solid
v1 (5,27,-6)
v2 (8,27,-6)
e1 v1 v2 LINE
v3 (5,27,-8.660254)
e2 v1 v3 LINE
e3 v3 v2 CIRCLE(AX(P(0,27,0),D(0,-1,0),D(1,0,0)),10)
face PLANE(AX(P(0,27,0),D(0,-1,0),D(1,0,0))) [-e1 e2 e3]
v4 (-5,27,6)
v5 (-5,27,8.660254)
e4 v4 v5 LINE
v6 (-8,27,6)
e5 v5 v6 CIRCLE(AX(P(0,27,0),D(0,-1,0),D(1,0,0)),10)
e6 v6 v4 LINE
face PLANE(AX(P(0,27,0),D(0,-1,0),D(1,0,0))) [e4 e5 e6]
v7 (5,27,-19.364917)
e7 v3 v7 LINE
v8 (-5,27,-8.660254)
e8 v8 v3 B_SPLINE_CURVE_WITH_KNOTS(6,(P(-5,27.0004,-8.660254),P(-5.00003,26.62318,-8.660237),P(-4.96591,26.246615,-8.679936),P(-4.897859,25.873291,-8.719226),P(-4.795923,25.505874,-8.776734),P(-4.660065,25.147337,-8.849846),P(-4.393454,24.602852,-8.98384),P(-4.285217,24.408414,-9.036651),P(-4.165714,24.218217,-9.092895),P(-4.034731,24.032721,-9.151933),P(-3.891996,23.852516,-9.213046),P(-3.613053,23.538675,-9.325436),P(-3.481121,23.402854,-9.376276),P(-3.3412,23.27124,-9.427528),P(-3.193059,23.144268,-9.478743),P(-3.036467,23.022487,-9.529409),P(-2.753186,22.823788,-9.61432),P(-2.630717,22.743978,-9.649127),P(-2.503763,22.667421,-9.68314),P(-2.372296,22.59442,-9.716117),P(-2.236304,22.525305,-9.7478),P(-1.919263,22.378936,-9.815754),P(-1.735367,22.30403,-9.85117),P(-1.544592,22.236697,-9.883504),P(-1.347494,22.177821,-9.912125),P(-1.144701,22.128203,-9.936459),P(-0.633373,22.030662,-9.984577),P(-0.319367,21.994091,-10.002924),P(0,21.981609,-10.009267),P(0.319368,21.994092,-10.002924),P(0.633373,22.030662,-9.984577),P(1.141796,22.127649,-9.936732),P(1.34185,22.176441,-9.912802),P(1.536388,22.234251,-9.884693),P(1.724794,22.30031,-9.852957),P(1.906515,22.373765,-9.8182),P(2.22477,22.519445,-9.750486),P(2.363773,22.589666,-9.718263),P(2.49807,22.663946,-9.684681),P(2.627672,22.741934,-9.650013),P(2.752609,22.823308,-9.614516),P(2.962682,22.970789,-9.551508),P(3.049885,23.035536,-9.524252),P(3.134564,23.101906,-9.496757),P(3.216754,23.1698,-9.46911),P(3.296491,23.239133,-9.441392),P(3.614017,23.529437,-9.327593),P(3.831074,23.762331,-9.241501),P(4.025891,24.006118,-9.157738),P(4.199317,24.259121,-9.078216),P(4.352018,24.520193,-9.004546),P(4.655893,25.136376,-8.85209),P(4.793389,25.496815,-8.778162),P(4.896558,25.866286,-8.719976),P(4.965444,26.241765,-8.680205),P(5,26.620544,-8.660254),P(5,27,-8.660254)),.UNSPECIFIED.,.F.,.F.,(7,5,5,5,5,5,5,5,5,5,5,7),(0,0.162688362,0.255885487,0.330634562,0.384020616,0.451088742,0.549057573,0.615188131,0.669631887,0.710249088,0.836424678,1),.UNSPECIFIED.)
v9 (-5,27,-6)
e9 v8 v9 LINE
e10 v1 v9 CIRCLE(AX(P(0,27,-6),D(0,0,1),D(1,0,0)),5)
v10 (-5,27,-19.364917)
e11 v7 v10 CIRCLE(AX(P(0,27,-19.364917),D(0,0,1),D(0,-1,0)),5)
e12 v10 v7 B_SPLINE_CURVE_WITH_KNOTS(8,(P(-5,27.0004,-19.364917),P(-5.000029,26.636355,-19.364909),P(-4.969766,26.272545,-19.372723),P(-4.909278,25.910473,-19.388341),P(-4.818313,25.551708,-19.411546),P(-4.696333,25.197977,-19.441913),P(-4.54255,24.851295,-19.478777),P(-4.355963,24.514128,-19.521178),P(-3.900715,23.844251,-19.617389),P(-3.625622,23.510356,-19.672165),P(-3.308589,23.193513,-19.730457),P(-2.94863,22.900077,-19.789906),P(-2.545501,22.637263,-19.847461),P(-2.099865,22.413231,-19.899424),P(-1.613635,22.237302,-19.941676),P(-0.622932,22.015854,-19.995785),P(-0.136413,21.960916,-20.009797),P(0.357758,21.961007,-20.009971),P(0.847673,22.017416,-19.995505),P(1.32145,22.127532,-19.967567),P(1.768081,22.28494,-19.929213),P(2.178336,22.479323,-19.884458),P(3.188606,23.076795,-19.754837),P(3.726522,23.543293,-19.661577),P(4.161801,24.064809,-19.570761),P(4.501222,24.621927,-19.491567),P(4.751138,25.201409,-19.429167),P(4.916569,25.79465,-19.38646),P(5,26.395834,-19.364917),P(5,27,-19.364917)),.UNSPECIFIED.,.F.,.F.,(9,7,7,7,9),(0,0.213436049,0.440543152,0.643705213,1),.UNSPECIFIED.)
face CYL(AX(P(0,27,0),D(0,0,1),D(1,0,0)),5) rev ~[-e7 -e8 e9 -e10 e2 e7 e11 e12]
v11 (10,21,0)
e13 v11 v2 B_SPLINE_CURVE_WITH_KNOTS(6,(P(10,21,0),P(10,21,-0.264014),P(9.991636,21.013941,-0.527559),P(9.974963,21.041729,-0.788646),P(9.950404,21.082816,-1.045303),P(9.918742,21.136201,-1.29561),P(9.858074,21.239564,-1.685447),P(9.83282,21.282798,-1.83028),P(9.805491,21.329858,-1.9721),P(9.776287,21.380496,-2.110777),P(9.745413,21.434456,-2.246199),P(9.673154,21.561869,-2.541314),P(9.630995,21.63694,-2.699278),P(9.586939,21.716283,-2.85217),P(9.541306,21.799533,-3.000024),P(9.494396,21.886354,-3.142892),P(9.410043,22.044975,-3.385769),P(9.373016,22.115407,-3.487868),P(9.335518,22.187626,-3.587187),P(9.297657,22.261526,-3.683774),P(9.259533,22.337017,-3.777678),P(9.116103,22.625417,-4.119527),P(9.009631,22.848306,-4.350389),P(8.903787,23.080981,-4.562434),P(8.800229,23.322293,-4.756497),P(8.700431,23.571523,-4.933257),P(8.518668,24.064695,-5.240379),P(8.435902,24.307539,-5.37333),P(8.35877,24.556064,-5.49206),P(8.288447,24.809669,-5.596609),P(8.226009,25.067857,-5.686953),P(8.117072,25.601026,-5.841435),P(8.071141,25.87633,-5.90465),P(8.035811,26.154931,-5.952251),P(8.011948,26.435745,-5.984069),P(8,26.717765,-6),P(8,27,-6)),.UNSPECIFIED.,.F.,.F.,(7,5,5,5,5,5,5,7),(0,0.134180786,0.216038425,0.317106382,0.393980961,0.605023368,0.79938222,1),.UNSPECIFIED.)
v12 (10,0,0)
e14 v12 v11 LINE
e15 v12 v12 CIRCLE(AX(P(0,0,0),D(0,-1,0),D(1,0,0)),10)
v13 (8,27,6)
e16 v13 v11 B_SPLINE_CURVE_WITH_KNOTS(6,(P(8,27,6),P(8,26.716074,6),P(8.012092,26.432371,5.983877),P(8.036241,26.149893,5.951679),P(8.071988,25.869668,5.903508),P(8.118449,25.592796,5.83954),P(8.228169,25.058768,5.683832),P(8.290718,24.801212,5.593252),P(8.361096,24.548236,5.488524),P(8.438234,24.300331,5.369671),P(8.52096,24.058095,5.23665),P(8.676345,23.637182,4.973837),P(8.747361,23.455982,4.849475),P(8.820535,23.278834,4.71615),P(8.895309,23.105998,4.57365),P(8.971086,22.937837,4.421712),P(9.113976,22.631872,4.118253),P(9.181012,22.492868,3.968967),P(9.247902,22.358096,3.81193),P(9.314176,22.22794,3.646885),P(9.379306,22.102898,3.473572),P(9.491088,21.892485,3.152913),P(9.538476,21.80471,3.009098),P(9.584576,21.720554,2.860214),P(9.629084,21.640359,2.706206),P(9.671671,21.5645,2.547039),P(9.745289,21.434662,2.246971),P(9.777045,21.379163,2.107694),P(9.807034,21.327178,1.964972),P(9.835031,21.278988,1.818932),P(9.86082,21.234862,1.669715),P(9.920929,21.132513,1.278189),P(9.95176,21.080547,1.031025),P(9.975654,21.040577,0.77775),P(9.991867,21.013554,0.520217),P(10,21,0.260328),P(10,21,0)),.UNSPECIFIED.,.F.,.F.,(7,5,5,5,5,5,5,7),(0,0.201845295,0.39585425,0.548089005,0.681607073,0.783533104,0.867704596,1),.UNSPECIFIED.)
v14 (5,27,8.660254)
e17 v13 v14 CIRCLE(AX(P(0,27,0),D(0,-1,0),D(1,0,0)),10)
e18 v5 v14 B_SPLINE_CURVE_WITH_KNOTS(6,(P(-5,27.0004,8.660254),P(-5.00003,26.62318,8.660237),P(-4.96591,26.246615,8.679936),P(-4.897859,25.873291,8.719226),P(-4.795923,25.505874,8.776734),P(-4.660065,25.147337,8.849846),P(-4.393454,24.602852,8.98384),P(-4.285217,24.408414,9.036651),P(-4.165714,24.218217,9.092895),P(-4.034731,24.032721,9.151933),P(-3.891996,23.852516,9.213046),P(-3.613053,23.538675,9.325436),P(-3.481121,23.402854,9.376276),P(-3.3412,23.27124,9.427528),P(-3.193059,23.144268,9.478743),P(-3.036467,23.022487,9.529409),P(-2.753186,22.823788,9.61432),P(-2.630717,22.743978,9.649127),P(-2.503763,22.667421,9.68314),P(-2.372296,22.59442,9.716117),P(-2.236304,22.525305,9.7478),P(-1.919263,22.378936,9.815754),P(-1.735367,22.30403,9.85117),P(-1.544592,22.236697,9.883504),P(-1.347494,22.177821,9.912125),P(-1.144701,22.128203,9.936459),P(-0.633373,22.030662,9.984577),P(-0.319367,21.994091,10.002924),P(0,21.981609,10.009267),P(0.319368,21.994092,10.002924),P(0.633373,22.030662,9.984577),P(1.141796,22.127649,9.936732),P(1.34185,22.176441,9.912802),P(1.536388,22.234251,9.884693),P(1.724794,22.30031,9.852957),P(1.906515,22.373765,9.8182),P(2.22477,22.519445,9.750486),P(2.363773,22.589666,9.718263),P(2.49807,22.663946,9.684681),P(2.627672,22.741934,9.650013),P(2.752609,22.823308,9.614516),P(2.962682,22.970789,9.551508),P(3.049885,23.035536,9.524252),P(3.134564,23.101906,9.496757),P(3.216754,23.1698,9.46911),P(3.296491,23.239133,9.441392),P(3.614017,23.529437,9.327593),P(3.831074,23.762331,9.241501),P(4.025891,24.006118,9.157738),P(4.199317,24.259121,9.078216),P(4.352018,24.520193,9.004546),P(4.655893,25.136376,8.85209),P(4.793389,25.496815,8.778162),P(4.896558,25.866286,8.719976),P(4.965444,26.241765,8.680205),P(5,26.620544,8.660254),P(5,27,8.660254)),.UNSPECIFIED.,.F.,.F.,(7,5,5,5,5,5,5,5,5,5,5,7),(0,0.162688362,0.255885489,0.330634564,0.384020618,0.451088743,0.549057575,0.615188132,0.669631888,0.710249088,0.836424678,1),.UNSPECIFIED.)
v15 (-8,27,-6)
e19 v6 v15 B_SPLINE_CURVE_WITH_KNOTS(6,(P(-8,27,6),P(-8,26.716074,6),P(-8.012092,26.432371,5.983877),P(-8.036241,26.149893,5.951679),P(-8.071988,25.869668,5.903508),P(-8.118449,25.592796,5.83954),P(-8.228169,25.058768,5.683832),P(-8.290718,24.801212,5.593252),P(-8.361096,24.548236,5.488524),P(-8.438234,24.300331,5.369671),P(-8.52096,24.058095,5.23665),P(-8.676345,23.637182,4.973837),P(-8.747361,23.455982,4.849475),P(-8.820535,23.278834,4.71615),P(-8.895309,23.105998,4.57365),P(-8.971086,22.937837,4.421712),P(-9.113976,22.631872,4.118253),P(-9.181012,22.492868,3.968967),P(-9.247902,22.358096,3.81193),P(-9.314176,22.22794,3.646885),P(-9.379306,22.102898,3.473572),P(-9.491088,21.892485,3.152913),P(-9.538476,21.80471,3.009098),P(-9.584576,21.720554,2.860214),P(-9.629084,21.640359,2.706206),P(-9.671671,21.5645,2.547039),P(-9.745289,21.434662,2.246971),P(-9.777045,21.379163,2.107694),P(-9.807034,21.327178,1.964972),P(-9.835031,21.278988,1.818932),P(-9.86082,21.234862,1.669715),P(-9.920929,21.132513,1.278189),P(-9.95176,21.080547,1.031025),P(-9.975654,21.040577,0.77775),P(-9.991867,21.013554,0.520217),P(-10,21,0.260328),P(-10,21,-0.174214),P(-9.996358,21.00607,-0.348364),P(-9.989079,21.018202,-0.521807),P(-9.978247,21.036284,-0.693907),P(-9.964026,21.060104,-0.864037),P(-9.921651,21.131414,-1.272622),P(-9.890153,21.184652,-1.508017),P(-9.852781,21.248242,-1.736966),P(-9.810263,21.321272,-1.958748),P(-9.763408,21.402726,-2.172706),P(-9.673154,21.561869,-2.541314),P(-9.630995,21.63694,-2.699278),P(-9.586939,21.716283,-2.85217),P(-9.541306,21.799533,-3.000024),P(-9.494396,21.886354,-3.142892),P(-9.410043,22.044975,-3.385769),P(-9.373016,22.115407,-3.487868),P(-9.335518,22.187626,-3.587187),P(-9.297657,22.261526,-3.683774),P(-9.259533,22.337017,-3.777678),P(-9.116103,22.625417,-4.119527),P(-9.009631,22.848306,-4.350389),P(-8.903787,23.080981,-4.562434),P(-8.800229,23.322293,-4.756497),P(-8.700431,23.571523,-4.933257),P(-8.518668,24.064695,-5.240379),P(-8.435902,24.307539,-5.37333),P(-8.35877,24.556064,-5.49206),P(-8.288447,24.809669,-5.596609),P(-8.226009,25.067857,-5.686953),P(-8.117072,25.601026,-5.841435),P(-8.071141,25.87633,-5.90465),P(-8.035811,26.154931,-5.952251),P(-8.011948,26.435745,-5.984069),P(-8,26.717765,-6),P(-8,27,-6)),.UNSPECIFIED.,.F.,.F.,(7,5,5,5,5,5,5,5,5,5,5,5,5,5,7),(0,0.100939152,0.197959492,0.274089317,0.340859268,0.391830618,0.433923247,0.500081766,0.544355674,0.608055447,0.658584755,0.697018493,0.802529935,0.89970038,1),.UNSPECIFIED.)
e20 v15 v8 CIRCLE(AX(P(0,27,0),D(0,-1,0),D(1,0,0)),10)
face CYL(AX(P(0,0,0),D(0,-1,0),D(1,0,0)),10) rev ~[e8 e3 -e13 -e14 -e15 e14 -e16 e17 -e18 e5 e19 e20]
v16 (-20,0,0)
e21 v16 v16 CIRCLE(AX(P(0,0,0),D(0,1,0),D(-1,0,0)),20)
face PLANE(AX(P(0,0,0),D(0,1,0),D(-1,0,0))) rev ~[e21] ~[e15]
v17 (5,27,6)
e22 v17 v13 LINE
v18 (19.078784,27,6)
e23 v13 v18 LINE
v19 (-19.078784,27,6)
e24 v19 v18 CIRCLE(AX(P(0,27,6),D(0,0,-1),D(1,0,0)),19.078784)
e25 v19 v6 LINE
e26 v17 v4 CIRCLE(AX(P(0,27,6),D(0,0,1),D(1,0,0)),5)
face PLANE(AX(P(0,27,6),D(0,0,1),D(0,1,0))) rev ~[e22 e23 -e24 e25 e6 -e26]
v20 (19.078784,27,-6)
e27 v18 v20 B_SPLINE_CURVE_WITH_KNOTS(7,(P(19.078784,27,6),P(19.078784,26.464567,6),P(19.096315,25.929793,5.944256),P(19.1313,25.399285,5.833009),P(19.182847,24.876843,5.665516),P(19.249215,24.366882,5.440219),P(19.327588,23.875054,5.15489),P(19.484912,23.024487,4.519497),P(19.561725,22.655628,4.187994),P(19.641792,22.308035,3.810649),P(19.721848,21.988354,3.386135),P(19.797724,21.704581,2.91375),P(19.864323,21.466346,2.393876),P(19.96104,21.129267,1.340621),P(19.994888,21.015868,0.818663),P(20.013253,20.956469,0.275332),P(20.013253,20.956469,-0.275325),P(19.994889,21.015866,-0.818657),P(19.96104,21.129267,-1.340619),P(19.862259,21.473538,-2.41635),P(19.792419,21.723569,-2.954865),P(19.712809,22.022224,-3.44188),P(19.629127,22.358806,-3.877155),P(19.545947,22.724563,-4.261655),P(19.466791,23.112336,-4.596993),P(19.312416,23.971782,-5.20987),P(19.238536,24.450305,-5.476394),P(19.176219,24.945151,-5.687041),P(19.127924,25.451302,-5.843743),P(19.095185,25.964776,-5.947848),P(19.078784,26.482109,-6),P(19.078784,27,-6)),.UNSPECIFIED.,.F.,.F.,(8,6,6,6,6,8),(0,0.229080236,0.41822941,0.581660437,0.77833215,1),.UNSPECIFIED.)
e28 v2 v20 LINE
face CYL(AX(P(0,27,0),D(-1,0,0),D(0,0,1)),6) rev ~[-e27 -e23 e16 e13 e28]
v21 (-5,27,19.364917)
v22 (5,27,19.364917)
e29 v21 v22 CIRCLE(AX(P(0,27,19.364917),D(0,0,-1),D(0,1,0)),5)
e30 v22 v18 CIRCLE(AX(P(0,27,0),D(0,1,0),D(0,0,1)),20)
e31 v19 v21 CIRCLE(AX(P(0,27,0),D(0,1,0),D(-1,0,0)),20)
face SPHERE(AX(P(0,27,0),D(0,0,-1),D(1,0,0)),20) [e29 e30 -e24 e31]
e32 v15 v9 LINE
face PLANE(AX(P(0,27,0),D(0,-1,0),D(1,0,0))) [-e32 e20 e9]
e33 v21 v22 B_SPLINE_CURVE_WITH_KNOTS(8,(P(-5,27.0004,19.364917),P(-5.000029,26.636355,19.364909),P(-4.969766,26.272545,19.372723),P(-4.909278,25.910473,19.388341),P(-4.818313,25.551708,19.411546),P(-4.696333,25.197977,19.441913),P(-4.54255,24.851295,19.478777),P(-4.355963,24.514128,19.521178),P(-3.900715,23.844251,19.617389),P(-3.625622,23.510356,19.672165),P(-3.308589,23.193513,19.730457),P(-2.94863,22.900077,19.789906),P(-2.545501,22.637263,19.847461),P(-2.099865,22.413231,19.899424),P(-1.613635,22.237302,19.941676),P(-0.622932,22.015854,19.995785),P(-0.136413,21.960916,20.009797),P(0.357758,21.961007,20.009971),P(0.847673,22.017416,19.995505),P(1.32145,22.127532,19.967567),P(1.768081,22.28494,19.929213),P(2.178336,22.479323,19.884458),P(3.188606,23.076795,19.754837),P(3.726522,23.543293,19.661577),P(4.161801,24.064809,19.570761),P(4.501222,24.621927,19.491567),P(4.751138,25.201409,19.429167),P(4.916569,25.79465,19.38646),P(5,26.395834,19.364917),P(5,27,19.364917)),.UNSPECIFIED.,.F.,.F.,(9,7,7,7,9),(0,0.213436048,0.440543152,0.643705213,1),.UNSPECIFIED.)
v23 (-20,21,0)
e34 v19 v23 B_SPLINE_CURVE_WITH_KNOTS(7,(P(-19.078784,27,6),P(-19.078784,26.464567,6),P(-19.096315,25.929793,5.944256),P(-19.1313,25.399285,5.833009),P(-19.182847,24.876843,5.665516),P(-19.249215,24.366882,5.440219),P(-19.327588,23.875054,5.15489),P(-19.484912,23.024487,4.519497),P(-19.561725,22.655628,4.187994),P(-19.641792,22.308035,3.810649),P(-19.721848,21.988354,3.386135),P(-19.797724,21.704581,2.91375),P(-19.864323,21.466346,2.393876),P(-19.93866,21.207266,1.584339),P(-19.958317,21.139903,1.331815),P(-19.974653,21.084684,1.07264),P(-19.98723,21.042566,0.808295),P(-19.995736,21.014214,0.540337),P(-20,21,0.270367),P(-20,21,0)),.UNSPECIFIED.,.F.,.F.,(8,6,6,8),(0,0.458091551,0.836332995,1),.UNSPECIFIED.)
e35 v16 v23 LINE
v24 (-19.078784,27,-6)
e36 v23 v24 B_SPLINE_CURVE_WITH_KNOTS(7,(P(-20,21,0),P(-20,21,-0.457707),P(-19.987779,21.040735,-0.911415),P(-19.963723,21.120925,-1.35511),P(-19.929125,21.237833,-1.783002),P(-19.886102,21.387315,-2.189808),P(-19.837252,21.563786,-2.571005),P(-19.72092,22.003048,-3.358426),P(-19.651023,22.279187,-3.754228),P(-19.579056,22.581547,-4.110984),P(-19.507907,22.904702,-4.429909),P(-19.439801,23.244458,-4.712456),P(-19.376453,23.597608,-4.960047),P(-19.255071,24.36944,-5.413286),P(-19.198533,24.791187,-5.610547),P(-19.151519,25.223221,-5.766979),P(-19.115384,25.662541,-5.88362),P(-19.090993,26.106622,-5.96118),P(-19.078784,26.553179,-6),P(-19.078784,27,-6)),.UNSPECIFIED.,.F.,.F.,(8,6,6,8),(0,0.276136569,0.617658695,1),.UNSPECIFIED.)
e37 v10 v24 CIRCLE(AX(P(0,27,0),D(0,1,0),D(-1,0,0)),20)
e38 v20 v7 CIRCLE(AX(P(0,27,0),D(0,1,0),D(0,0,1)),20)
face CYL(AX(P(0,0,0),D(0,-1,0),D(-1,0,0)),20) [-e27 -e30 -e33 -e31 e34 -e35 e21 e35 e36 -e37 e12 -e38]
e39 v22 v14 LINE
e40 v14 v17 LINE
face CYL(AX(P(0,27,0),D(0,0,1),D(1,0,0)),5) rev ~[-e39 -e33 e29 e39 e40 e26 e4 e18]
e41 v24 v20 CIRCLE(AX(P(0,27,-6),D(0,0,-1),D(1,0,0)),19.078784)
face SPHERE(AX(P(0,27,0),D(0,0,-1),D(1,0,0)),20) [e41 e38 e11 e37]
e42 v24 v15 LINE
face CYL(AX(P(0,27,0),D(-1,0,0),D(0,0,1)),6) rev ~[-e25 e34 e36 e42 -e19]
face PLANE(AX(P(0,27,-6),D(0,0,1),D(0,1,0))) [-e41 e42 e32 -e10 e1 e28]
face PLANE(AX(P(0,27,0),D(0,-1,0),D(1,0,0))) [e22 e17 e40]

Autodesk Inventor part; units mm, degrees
ref_plane "YZ Plane" through (0, 0, 0) normal (1, 0, 0) x (0, 1, 0)
ref_plane "XZ Plane" through (0, 0, 0) normal (0, 1, 0) x (-1, 0, 0)
ref_plane "XY Plane" through (0, 0, 0) normal (0, 0, 1) x (1, 0, 0)
sketch "Sketch1" plane through (0, 0, 0) normal (0, 1, 0) x (-1, 0, 0)
  circle A0 centre (0, 0) radius 20
  dimension "d0" = 40
extrude "Extrusion1" add sketch "Sketch1" along normal blind 27
sketch "Sketch2" plane through (0, 27, 0) normal (0, 1, 0) x (1, 0, 0)
  circle A0 centre (0, 0) radius 20 construction
  circle A1 centre (0, 0) radius 20 construction
  line L0 (0, -20) -> (0, 20) construction
  arc A2 (0, -20) -> (0, 20) centre (0, 0) ccw
  line L1 (0, -20) -> (0, 20)
  dimension "d3" = 40
revolve "Revolution1" add sketch "Sketch2" angle 180 about axis through (0, 27, 20) along (0, 0, 1)
sketch "Sketch3" plane through (0, 0, 0) normal (0, 0, 1) x (1, 0, 0)
  line L0 (20, 27) -> (-20, 27) construction
  line L1 (20, 27) -> (-20, 27) construction
  line L2 (20, 0) -> (-20, 0) construction
  circle A0 centre (0, 27) radius 5
  arc A1 (20, 27) -> (-20, 27) centre (0, 27) ccw construction
  point P0 (0, 0)
  point P1 (0, 0)
  dimension "d5" = 10
extrude "Extrusion2" cut sketch "Sketch3" along normal through all both and the other way through all
sketch "Sketch4" plane through (0, 0, 0) normal (1, 0, 0) x (0, 1, 0)
  line L0 (27, 19.3649) -> (27, 19.3649) construction
  line L1 (27, 19.3649) -> (27, -19.3649) construction
  line L2 (27, -19.3649) -> (27, -19.3649) construction
  line L3 (27, -19.3649) -> (27, 19.3649) construction
  line L4 (27, 19.3649) -> (27, 19.3649) construction
  line L5 (27, -19.3649) -> (27, -19.3649) construction
  line L6 (0, -20) -> (0, 20) construction
  line L7 (27, -19.3649) -> (27, 19.3649) construction
  line L8 (27, 19.3649) -> (27, -19.3649) construction
  line L9 (27, -19.3649) -> (27, 19.3649) construction
  arc A0 (27, 6) -> (27, -6) centre (27, 0) ccw
  line L10 (27, -6) -> (47.2684, -6)
  line L11 (27, 6) -> (47.2684, 6)
  line L12 (47.2684, -6) -> (47.2684, 6)
  point P0 (0, 0)
  dimension "d8" = 12
  dimension "d9" = 20.2684
extrude "Extrusion3" cut sketch "Sketch4" along normal through all both and the other way through all
sketch "Sketch5" plane through (0, 0, 0) normal (0, -1, 0) x (1, 0, 0)
  circle A0 centre (0, 0) radius 10
  dimension "d12" = 20
extrude "Extrusion4" cut sketch "Sketch5" against normal up to surface (27 mm away)
properties part number "cupula_obj5"
